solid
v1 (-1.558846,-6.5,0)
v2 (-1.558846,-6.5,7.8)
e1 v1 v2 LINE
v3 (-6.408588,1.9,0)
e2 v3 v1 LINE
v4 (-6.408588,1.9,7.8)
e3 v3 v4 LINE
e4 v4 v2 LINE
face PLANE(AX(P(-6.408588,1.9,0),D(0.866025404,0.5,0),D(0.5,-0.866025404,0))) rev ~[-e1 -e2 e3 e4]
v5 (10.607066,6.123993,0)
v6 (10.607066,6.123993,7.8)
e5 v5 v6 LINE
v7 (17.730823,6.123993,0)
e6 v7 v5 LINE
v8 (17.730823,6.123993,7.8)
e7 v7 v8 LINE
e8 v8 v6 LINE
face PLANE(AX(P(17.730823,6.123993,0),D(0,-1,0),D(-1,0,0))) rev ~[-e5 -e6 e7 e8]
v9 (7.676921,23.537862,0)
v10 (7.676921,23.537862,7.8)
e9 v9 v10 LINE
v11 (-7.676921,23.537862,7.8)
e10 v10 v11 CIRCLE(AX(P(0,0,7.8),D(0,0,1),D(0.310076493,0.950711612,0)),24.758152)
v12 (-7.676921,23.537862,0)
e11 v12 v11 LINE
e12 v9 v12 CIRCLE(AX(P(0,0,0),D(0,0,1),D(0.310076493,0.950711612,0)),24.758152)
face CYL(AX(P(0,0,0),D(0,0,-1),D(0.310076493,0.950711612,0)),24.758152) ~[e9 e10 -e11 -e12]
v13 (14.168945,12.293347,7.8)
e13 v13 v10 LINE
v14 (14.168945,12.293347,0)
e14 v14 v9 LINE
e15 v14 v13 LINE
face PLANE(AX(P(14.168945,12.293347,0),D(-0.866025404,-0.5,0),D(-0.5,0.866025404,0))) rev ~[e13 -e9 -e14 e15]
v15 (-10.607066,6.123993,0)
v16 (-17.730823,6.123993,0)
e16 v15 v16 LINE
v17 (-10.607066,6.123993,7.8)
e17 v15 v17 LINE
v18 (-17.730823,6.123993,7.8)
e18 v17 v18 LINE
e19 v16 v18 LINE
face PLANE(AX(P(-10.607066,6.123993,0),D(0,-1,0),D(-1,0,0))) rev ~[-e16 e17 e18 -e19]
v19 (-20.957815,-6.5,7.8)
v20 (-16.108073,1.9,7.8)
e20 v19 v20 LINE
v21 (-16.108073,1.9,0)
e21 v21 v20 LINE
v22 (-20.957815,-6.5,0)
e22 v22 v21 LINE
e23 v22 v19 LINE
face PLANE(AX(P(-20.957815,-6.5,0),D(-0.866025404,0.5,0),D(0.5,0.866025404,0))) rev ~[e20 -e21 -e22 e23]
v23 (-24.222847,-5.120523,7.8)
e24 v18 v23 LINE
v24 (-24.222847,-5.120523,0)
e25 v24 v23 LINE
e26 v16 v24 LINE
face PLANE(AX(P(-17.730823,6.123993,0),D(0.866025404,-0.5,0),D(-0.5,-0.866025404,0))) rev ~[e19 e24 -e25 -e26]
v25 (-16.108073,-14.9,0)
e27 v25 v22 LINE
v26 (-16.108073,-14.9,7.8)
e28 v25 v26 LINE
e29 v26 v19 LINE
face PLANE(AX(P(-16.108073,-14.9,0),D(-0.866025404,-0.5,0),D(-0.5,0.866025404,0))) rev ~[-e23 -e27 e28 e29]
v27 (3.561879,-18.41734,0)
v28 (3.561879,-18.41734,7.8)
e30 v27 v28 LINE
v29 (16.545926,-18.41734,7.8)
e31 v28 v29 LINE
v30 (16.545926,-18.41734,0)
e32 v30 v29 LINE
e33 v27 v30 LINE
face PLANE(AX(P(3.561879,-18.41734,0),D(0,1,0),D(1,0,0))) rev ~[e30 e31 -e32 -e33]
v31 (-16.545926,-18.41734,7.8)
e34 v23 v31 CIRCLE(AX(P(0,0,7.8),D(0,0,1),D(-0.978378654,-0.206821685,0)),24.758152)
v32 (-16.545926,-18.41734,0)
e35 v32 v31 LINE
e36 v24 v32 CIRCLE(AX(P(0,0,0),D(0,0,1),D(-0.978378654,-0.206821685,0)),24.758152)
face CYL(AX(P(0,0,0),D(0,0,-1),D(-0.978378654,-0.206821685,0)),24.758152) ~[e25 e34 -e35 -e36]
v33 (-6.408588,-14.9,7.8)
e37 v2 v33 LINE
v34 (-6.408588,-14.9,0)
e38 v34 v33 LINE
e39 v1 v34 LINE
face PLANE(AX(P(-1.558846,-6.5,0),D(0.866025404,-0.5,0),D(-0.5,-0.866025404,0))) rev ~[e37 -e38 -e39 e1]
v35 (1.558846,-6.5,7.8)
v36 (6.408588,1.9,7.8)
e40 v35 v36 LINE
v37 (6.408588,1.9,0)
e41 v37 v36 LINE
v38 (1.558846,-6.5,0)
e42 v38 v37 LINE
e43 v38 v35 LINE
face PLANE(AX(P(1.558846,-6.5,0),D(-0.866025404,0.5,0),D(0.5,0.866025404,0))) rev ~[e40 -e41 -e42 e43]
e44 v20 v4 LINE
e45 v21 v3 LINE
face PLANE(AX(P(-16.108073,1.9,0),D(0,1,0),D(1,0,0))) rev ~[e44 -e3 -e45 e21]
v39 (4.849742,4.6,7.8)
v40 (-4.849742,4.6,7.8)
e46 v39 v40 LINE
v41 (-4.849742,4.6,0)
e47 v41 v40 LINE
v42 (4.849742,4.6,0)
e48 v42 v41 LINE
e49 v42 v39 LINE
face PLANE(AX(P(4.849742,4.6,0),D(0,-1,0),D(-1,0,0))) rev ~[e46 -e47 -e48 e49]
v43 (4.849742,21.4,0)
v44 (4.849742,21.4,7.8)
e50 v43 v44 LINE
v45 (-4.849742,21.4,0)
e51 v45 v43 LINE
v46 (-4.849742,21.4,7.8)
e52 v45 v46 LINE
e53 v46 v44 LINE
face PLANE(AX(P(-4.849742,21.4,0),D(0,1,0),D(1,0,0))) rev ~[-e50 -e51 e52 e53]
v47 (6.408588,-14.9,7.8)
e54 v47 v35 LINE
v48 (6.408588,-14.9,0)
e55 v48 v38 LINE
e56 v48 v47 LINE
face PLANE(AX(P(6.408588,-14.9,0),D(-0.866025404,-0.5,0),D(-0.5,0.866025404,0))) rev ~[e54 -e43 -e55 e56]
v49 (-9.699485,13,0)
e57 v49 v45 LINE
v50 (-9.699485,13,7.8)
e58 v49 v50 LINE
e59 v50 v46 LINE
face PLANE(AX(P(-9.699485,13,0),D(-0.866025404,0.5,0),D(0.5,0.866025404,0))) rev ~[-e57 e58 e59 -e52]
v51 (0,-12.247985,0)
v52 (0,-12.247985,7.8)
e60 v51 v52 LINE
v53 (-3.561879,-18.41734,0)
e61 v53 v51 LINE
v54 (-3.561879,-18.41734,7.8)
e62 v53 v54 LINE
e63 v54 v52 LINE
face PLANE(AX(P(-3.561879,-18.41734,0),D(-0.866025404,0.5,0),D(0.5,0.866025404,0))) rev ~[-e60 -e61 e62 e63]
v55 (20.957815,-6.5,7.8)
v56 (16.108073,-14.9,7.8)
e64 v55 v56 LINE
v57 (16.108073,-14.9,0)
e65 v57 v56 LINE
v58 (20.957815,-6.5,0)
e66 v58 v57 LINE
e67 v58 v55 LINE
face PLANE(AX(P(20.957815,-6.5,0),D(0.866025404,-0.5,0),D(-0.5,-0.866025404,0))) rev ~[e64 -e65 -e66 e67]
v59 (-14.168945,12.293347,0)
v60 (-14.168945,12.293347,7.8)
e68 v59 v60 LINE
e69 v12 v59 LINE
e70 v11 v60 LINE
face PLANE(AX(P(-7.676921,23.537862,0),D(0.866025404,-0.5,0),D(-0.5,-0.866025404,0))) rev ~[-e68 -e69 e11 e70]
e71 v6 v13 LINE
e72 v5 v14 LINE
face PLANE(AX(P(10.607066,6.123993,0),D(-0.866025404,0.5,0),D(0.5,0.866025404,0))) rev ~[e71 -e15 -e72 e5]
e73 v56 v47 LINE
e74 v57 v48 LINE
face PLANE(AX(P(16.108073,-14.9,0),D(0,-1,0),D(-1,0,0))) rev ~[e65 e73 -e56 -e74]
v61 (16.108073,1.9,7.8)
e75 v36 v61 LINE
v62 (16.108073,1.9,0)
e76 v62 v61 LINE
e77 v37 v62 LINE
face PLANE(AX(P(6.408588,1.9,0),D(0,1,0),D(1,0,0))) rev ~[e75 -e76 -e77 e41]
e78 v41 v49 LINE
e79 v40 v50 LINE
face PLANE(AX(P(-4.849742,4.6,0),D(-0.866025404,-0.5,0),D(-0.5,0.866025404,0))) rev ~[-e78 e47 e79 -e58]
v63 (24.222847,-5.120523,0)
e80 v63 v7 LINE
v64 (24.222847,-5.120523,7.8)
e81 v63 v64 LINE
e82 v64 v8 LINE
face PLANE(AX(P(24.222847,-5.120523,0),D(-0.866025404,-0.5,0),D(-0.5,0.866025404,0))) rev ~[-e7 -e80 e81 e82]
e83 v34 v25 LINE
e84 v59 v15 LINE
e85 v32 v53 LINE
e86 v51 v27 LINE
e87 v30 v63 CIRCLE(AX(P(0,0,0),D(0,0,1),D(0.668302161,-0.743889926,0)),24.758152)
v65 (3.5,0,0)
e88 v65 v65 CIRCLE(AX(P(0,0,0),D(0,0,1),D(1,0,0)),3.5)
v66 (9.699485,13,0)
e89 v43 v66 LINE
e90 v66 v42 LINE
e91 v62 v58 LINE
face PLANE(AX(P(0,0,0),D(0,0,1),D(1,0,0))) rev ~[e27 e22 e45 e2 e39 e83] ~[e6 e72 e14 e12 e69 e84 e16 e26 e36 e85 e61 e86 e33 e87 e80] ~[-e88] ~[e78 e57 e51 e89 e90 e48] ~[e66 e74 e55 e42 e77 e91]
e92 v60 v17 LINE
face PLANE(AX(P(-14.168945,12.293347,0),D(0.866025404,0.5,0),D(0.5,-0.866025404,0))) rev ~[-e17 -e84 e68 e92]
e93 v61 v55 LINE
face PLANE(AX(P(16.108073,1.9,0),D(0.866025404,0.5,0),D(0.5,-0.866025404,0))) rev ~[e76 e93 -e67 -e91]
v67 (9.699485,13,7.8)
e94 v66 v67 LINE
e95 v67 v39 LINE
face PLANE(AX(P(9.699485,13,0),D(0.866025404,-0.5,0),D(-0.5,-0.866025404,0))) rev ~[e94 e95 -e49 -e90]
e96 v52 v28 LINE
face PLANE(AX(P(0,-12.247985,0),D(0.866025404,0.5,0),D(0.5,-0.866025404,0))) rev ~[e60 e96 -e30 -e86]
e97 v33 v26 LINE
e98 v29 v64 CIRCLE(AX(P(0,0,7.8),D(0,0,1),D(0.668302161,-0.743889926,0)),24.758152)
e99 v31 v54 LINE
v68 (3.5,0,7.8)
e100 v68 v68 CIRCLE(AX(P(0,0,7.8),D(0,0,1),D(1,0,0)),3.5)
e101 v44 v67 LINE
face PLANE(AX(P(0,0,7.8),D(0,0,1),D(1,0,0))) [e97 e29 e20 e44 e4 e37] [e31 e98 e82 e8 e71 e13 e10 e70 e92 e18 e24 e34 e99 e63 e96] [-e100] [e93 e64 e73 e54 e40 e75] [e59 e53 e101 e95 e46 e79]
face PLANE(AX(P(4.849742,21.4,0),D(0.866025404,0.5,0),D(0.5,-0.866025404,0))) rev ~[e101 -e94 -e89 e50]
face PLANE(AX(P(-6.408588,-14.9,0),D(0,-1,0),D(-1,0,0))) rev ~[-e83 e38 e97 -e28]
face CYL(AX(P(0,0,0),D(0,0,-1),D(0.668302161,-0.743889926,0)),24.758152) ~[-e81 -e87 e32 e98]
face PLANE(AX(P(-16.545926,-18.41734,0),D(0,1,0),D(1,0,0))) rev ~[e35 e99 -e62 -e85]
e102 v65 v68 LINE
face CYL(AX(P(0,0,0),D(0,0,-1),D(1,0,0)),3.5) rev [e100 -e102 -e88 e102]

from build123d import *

# Parameters (mm, degrees)
F0_R     = 3.5
F1_DEPTH = 7.8


# Not quite as in the source:
# - the program builds the solid bodies; features that only make, move or delete a surface that nothing else refers to are left out


with BuildPart() as f1:
    # F0 (on Top) → F1 (new body)
    with BuildSketch(Plane.XY):
        with BuildLine():
            ThreePointArc((16.5459263903, -18.417339772), (21.4411884767, -12.3790759388), (24.2228473078, -5.1205226972))
            Line((24.2228473078, -5.1205226972), (17.7308233658, 6.1239926144))
            Line((17.7308233658, 6.1239926144), (10.6070663534, 6.1239926144))
            Line((10.6070663534, 6.1239926144), (14.1689448596, 12.2933471575))
            Line((14.1689448596, 12.2933471575), (7.6769209175, 23.5378624692))
            ThreePointArc((7.6769209175, 23.5378624692), (0, 24.7581518775), (-7.6769209175, 23.5378624692))
            Line((-7.6769209175, 23.5378624692), (-14.1689448596, 12.2933471575))
            Line((-14.1689448596, 12.2933471575), (-10.6070663534, 6.1239926144))
            Line((-10.6070663534, 6.1239926144), (-17.7308233658, 6.1239926144))
            Line((-17.7308233658, 6.1239926144), (-24.2228473078, -5.1205226972))
            ThreePointArc((-24.2228473078, -5.1205226972), (-21.4411884767, -12.3790759388), (-16.5459263903, -18.417339772))
            Line((-16.5459263903, -18.417339772), (-3.5618785062, -18.417339772))
            Line((-3.5618785062, -18.417339772), (0, -12.2479852289))
            Line((0, -12.2479852289), (3.5618785062, -18.417339772))
            Line((3.5618785062, -18.417339772), (16.5459263903, -18.417339772))
        make_face()
        Polygon((-6.408587988, -14.9), (-16.1080725104, -14.9), (-20.9578147716, -6.5), (-16.1080725104, 1.9), (-6.408587988, 1.9), (-1.5588457268, -6.5), align=None, mode=Mode.SUBTRACT)
        Polygon((16.1080725104, 1.9), (20.9578147716, -6.5), (16.1080725104, -14.9), (6.408587988, -14.9), (1.5588457268, -6.5), (6.408587988, 1.9), align=None, mode=Mode.SUBTRACT)
        Circle(F0_R, mode=Mode.SUBTRACT)
        Polygon((9.6994845224, 13), (4.8497422612, 4.6), (-4.8497422612, 4.6), (-9.6994845224, 13), (-4.8497422612, 21.4), (4.8497422612, 21.4), align=None, mode=Mode.SUBTRACT)
    extrude(amount=F1_DEPTH)


solid = f1.part
